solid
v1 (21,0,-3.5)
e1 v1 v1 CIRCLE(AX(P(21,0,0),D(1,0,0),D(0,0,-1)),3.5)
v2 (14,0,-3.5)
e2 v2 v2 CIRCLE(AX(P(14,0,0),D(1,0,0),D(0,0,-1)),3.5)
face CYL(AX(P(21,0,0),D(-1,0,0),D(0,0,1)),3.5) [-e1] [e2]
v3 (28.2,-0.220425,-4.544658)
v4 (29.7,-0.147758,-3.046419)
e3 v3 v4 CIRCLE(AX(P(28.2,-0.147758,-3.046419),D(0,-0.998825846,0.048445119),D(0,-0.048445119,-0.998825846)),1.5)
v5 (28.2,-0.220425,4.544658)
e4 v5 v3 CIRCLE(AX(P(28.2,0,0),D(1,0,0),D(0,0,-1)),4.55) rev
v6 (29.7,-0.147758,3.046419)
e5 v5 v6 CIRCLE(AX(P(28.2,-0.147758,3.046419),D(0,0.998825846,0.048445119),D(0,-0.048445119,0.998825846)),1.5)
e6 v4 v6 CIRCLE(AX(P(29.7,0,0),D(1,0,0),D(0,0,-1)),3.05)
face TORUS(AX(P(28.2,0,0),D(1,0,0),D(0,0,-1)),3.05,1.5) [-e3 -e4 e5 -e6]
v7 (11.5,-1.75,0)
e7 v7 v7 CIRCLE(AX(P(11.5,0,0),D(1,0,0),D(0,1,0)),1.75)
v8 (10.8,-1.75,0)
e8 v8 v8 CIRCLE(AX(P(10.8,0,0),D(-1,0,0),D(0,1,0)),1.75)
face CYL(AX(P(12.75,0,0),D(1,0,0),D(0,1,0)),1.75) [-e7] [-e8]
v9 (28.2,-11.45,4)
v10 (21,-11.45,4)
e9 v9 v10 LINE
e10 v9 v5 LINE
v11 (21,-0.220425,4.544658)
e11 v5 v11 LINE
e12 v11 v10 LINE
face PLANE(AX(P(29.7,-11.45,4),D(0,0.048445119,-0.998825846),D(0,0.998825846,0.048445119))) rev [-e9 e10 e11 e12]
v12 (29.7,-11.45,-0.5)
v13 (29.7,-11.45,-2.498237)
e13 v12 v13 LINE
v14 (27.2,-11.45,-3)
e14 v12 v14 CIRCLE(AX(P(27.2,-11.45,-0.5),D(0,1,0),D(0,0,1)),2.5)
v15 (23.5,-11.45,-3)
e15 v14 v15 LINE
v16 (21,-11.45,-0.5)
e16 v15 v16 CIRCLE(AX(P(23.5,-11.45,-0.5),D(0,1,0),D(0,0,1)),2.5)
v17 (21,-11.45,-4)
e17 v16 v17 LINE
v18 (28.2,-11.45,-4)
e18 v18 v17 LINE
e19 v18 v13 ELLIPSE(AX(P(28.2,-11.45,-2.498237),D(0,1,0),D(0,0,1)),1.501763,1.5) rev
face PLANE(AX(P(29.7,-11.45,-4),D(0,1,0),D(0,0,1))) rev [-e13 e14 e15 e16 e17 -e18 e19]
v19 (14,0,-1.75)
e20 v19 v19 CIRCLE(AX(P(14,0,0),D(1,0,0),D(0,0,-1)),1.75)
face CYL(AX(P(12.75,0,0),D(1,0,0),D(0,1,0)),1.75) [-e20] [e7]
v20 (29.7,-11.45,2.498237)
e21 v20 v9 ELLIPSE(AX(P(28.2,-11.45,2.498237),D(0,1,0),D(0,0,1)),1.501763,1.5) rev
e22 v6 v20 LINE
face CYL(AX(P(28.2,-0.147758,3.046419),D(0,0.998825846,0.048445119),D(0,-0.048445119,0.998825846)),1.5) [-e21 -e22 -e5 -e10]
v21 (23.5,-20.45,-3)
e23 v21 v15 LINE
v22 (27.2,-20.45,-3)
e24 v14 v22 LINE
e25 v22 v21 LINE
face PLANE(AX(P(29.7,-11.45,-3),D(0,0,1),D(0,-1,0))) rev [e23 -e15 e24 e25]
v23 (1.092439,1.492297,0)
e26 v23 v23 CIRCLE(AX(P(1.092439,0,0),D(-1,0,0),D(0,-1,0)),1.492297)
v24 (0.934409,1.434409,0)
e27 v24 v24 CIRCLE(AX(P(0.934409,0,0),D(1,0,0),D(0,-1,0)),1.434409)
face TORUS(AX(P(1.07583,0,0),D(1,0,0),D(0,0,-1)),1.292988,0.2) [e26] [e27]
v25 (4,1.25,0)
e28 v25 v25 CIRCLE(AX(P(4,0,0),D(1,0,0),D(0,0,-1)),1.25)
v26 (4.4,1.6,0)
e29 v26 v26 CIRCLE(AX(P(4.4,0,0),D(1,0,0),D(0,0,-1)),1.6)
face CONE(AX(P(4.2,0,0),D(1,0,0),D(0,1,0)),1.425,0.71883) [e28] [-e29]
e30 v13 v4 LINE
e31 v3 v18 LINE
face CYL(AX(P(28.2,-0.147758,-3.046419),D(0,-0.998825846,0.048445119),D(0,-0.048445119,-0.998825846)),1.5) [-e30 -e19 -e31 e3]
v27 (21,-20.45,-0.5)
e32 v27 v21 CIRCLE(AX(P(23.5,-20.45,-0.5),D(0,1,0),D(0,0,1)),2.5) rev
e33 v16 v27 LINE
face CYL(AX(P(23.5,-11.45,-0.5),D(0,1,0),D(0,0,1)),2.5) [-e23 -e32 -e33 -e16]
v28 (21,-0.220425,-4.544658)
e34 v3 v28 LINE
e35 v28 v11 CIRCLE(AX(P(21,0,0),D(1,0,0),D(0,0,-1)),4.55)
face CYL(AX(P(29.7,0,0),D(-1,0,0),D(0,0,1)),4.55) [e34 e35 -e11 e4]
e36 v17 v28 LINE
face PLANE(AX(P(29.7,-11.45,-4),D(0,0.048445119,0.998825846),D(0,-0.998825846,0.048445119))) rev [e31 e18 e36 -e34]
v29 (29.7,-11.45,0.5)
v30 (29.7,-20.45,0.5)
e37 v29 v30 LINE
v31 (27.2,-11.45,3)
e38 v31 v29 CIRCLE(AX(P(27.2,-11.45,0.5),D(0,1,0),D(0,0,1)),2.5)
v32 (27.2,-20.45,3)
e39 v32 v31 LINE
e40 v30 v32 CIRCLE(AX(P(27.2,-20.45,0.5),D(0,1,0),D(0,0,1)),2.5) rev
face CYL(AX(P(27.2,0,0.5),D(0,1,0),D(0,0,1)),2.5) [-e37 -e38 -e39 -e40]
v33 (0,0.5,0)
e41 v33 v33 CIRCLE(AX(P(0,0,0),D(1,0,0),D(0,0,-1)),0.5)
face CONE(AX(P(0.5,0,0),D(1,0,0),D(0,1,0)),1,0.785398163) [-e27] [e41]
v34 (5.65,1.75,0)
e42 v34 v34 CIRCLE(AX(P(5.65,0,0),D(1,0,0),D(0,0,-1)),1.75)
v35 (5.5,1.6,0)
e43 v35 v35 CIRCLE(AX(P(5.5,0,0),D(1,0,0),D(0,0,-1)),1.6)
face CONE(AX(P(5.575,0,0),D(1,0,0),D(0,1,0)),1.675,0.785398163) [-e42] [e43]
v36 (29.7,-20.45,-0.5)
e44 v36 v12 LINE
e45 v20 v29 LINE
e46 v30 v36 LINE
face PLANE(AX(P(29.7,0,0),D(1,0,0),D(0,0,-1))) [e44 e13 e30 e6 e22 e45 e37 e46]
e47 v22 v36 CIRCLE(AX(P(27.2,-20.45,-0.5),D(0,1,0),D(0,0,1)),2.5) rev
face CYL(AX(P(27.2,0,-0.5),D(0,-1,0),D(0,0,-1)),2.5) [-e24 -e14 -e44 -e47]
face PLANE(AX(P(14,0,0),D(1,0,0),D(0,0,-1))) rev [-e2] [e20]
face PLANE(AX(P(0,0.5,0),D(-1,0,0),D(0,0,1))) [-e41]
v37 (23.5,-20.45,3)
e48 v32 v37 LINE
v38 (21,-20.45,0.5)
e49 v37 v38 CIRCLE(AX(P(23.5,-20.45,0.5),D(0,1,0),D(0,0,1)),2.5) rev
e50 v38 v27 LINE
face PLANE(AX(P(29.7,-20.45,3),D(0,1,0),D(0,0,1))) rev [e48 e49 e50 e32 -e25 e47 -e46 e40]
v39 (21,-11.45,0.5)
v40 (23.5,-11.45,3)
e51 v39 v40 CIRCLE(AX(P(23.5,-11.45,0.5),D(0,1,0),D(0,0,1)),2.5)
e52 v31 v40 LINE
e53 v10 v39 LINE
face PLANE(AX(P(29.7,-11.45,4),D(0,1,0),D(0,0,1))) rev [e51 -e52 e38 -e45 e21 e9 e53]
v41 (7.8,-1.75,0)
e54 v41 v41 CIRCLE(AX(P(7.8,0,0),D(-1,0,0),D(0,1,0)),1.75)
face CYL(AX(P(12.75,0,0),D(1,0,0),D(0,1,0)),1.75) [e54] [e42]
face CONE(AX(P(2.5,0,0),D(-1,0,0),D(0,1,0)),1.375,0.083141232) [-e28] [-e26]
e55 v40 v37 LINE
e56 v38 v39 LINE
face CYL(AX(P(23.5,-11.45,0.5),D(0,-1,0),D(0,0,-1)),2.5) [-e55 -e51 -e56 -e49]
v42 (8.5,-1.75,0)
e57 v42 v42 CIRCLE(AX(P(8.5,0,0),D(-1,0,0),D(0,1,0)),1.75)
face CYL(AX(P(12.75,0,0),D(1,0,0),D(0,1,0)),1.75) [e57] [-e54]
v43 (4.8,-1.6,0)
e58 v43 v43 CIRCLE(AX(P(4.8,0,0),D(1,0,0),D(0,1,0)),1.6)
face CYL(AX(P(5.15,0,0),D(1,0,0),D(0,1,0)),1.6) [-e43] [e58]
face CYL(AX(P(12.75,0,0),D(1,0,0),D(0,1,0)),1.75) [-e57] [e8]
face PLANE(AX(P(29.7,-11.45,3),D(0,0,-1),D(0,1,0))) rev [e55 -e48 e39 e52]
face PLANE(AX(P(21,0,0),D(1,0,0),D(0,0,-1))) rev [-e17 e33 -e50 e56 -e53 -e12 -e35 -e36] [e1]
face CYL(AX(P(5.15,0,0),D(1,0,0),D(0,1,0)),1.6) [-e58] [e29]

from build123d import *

# Parameters (mm, degrees)
SKETCH1_R           = 3.5
BOSS_EXTRUDE1_DEPTH = 7
BOSS_EXTRUDE2_DEPTH = 8.7
FILLET1_R           = 2.5
FILLET2_R           = 1.5


with BuildPart() as part:
    # SurfaceCut1: read off the stored shape, not the designer's step
    # SurfaceCut1 outline → SurfaceCut1 (revolve)
    with BuildSketch(Plane.YX):
        with BuildLine():
            Line((0.5, 0), (1.434408923, 0.934408923))
            ThreePointArc((1.434408923, 0.934408923), (1.4807846, 1.007038752), (1.492296719, 1.092439376))
            Line((1.492296719, 1.092439376), (1.25, 4))
            Line((1.25, 4), (1.6, 4.4))
            Line((1.6, 4.4), (1.6, 5.5))
            Line((1.6, 5.5), (1.75, 5.65))
            Line((1.75, 5.65), (1.75, 14))
            Line((1.75, 14), (0, 14))
            Line((0, 14), (0, 0))
            Line((0, 0), (0.5, 0))
        make_face()
    revolve(axis=Axis((0, 0, 0), (1, 0, 0)))

    # Sketch1 → Boss-Extrude1 (add)
    with BuildSketch(Plane(origin=(14, 0, 0), x_dir=(0, 0, -1), z_dir=(1, 0, 0))):
        Circle(SKETCH1_R)
    extrude(amount=BOSS_EXTRUDE1_DEPTH)

    # Sketch2 → Boss-Extrude2 (add)
    with BuildSketch(Plane(origin=(21, 0, 0), x_dir=(0, 0, -1), z_dir=(1, 0, 0))):
        with BuildLine():
            Line((-4, -11.45), (-4.544657599, -0.220425293))
            ThreePointArc((-4.544657599, -0.220425293), (0, 4.55), (4.544657599, -0.220425293))
            Line((4.544657599, -0.220425293), (4, -11.45))
            Line((4, -11.45), (3, -11.45))
            Line((3, -11.45), (3, -20.45))
            Line((3, -20.45), (-3, -20.45))
            Line((-3, -20.45), (-3, -11.45))
            Line((-3, -11.45), (-4, -11.45))
        make_face()
    extrude(amount=BOSS_EXTRUDE2_DEPTH)

    # Fillet1
    fillet1_edges = [part.edges().sort_by_distance(p)[0] for p in [
        (21, -15.95, 3),
        (21, -15.95, -3),
        (29.7, -15.95, 3),
        (29.7, -15.95, -3),
    ]]
    fillet(fillet1_edges, radius=FILLET1_R)

    # Fillet2
    fillet2_edges = [part.edges().sort_by_distance(p)[0] for p in [
        (29.7, 4.55, 0),
        (29.7, -5.835212647, 4.272328799),
        (29.7, -5.835212647, -4.272328799),
    ]]
    fillet(fillet2_edges, radius=FILLET2_R)


solid = part.part
